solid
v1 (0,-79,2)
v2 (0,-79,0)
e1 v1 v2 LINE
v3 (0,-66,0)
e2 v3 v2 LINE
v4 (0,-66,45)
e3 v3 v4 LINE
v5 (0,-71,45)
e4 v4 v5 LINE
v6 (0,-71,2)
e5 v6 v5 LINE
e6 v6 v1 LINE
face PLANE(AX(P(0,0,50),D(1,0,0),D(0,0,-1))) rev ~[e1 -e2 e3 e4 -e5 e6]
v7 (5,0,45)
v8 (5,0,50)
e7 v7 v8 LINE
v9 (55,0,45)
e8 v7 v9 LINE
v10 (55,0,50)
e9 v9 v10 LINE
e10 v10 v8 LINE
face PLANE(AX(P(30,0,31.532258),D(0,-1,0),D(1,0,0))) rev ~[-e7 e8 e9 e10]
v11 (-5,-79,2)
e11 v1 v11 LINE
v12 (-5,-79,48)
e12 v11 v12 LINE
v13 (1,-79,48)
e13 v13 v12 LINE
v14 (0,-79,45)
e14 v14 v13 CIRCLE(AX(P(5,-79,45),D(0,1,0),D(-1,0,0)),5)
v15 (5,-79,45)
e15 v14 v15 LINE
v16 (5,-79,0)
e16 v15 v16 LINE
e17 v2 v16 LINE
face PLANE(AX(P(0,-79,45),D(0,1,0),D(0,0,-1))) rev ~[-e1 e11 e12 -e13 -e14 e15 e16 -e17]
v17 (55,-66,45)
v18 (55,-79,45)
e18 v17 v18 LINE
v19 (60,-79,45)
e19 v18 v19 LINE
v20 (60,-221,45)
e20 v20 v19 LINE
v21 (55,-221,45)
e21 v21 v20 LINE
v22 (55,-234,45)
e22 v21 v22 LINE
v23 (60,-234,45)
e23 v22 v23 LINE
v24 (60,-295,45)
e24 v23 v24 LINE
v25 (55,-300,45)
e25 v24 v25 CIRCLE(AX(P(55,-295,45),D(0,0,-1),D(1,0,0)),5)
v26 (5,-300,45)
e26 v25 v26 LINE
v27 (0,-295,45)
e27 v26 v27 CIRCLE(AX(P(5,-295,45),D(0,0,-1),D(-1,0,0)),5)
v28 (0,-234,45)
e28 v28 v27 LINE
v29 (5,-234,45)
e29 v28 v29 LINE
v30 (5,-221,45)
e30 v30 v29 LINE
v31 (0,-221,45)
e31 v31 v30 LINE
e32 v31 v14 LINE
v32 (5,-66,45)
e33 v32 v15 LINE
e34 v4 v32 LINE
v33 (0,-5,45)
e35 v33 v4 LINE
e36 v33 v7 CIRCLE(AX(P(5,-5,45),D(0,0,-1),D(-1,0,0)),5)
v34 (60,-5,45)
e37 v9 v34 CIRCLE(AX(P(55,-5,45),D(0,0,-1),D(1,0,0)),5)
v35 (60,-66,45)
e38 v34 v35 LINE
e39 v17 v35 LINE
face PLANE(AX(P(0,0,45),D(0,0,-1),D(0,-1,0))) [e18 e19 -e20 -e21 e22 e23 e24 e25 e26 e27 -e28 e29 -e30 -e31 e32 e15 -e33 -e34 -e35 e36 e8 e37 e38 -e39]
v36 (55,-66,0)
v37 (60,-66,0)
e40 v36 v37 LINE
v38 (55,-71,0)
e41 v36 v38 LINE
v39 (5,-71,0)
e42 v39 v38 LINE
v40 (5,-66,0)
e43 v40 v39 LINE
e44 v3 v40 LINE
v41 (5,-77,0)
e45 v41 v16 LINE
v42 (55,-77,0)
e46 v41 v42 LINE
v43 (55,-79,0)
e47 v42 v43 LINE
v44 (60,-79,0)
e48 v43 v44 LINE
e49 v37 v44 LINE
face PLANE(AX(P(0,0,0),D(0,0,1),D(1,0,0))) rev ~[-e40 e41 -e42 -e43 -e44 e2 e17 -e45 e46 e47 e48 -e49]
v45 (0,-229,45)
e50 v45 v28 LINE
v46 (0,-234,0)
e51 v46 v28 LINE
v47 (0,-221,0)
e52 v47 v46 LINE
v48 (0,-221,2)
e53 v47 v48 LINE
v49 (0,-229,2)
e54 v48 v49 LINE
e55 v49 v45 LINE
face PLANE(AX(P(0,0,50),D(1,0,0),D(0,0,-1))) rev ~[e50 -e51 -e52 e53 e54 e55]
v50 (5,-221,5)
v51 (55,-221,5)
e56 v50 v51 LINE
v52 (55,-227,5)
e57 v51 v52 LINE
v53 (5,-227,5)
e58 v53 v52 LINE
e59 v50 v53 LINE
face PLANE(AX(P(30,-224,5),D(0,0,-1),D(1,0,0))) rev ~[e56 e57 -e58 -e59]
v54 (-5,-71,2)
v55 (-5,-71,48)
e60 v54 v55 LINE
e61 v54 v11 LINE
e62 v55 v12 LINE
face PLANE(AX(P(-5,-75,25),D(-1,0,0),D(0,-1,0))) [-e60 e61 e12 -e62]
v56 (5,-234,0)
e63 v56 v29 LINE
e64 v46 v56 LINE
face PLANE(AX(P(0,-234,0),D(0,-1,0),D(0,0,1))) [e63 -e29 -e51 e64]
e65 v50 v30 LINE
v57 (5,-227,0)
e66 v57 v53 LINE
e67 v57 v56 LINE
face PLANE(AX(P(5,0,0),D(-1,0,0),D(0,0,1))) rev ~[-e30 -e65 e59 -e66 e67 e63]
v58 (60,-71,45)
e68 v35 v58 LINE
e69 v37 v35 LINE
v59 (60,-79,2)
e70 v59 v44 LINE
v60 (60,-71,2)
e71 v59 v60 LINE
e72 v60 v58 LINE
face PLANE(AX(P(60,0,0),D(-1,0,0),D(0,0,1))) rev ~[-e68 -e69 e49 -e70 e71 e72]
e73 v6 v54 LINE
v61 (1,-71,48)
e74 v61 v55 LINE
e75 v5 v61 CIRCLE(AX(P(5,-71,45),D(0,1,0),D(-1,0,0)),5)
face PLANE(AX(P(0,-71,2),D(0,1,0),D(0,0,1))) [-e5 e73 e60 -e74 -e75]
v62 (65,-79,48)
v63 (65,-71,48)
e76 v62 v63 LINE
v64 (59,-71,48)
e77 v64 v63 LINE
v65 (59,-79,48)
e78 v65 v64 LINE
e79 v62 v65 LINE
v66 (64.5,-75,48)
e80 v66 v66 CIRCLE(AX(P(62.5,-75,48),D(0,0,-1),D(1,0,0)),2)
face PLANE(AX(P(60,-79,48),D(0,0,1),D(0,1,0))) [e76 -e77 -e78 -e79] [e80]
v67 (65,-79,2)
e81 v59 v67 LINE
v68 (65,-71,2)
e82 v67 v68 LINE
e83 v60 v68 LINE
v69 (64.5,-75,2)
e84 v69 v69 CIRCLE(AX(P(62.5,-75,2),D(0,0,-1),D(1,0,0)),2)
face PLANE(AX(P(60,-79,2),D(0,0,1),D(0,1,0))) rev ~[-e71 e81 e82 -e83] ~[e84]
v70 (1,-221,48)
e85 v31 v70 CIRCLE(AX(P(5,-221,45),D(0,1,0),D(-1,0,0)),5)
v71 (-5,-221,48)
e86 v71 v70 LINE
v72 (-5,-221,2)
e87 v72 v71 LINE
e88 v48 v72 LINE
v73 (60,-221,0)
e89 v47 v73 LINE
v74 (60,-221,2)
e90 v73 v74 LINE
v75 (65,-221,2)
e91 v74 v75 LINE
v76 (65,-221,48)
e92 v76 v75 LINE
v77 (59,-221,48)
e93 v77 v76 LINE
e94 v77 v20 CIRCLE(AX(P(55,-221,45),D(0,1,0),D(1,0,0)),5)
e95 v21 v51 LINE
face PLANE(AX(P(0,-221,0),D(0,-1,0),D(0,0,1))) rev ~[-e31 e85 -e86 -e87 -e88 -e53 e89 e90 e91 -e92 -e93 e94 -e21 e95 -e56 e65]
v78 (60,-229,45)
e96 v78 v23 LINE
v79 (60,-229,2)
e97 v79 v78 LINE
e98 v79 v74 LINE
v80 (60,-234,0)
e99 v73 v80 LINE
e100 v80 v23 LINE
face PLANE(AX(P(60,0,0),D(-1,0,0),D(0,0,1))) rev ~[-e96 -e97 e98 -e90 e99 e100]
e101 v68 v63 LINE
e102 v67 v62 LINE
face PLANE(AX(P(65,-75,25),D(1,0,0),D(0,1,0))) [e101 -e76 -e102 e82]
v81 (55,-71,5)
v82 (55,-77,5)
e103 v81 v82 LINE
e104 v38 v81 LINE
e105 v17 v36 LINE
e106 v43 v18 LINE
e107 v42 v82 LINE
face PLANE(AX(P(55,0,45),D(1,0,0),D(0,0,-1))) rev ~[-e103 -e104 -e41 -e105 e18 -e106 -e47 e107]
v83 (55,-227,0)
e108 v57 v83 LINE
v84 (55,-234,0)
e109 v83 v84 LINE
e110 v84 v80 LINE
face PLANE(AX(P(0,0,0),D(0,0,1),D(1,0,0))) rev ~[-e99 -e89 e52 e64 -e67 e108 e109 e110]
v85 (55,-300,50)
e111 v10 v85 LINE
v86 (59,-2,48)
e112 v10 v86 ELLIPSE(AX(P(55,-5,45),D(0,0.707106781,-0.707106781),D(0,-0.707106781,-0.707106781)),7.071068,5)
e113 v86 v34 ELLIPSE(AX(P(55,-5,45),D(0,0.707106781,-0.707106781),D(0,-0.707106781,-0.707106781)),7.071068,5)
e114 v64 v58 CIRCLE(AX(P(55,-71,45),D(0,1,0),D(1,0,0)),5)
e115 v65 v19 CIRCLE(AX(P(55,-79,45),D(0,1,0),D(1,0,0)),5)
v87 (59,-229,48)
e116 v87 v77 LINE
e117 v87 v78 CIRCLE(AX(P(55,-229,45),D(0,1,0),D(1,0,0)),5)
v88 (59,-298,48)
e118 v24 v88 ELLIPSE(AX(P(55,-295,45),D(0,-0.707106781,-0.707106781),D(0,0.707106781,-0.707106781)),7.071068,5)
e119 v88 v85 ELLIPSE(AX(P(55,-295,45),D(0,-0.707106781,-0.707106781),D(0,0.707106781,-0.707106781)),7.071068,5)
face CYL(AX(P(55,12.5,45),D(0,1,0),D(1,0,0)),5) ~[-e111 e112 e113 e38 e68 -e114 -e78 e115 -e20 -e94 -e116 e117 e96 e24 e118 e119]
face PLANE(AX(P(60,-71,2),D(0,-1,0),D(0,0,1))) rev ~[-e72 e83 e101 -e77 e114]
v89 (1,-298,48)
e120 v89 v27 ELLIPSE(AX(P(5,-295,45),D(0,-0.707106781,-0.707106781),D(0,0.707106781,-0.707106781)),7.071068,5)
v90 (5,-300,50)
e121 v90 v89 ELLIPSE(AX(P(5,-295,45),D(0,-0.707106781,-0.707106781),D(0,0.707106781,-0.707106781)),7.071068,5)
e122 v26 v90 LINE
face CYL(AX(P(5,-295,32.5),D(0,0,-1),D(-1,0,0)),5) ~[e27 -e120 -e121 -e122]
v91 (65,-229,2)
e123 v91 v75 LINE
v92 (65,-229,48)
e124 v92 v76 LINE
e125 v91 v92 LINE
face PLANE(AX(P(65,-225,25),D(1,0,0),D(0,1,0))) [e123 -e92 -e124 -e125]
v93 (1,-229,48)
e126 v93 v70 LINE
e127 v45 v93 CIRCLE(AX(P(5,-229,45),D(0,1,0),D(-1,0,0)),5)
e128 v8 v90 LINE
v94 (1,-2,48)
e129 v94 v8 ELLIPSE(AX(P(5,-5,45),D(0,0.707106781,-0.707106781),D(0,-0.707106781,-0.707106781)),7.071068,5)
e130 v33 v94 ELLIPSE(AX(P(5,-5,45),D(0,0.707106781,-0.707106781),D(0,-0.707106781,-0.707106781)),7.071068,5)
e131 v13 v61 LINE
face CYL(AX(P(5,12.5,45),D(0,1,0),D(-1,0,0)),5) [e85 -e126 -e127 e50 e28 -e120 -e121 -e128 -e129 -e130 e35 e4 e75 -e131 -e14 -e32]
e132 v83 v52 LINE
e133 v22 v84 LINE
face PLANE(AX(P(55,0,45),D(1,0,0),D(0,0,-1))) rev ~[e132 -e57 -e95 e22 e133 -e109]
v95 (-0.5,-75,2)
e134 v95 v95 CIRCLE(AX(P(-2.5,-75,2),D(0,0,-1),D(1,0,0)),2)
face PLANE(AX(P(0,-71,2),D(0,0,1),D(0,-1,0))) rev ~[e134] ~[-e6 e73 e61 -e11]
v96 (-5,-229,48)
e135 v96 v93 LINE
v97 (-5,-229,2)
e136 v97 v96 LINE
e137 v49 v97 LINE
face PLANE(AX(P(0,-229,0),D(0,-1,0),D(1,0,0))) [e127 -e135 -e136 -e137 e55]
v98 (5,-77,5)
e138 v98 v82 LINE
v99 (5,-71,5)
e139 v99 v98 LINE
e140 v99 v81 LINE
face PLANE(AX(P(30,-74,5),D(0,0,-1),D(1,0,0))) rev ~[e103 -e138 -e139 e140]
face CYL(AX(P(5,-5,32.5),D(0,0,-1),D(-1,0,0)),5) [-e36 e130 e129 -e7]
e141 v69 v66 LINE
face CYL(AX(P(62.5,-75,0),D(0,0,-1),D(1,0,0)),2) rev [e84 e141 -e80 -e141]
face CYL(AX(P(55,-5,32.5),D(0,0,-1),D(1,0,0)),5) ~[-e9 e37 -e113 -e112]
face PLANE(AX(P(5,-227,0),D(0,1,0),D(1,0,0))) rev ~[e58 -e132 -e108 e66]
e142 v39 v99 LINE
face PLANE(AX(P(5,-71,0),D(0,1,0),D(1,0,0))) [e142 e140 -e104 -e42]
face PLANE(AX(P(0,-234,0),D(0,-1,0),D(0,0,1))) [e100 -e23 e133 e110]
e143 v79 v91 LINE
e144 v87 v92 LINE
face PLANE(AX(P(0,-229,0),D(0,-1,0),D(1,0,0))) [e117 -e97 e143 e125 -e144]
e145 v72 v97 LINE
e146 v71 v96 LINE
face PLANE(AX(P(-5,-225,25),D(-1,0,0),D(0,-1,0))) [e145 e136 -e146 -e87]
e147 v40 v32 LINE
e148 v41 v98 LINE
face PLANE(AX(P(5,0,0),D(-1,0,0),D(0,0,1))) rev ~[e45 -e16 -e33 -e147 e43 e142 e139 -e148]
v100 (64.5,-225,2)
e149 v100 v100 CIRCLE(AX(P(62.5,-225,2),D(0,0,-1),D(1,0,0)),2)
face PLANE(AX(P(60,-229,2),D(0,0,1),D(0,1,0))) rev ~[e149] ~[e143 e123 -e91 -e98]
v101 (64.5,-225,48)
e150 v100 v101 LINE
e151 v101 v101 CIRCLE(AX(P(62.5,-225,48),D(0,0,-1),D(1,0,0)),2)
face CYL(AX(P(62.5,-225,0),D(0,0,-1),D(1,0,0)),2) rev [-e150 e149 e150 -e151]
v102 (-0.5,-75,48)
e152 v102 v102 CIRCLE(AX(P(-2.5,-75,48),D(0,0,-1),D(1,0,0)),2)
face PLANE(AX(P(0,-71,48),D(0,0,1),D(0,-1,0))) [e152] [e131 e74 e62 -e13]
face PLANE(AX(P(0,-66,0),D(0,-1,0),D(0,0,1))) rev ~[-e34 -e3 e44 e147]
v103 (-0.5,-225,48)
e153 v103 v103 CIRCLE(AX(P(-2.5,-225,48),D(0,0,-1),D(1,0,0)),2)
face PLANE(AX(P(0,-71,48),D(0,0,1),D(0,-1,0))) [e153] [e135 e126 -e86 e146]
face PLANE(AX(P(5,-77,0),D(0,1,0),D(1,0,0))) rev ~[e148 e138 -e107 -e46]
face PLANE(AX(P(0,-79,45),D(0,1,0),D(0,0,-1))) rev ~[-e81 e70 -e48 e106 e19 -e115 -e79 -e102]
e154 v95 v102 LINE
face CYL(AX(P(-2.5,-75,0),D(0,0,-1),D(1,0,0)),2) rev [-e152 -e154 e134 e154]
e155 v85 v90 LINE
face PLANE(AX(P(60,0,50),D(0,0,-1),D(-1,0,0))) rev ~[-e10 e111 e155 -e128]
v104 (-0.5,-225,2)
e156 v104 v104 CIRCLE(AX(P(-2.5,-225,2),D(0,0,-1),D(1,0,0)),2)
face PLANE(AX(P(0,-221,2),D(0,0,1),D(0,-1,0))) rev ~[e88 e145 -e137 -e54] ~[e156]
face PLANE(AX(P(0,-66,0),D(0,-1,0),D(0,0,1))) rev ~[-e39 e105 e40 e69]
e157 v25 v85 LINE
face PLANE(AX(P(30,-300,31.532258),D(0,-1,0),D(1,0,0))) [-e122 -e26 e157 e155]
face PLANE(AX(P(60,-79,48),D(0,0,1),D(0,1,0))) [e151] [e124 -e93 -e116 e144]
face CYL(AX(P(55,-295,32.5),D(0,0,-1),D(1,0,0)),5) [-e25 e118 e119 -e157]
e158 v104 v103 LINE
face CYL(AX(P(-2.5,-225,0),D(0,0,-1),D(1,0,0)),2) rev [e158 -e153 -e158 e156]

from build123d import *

# Parameters (mm, degrees)
F2_DEPTH      = 300
F3_W          = 8
F3_H          = 46
F4_DEPTH      = 5
F5_W          = 8
F5_H          = 46
F6_DEPTH      = 5
F7_W          = 50
F7_H          = 6
F8_DEPTH      = 5
F9_W          = 66
F9_H          = 45
F10_DEPTH     = 65.001
F11_R         = 2
F12_DEPTH     = 50.001
F13_T1_DEPTH  = 30
F13_T6_DEPTH  = 325
F13_T11_DEPTH = 325
F13_T16_DEPTH = 325
F13_T22_DEPTH = 325
F13_T27_DEPTH = 325
F13_T32_DEPTH = 325
F13_T37_DEPTH = 325
F13_T43_DEPTH = 325


# Not quite as in the source:
# - a fillet or chamfer that OpenCascade refuses, or shapes differently, is made with other operations: its cross-section is extruded or revolved along the edge and cut away or added


with BuildPart() as f2:
    # F1 (on face) → F2 (new body)
    with BuildSketch(Plane.XZ):
        Polygon((0, 0), (5, 0), (5, 45), (55, 45), (55, 0), (60, 0), (60, 50), (0, 50), align=None)
    extrude(amount=F2_DEPTH)

    # F3 (on face) → F4 (join)
    with BuildSketch(Plane.YZ.offset(60)):
        with Locations((-225, 25)):
            Rectangle(F3_W, F3_H)
        with Locations((-75, 25)):
            Rectangle(F3_W, F3_H)
    extrude(amount=F4_DEPTH)

    # F5 (on face) → F6 (join)
    with BuildSketch(Plane(origin=(0, 0, 0), x_dir=(0, -1, 0), z_dir=(-1, 0, 0))):
        with Locations((75, 25)):
            Rectangle(F5_W, F5_H)
        with Locations((225, 25)):
            Rectangle(F5_W, F5_H)
    extrude(amount=F6_DEPTH)

    # F7 (on face) → F8 (join)
    with BuildSketch(Plane(origin=(0, 0, 0), x_dir=(1, 0, 0), z_dir=(0, 0, -1))):
        with Locations((30, 74)):
            Rectangle(F7_W, F7_H)
        with Locations((30, 224)):
            Rectangle(F7_W, F7_H)
    extrude(amount=-F8_DEPTH)

    # F9 (on face) → F10 (cut, through all)
    with BuildSketch(Plane(origin=(0, 0, 0), x_dir=(0, -1, 0), z_dir=(-1, 0, 0))):
        Polygon((221, 45), (79, 45), (79, 2), (79, 0), (221, 0), (221, 2), align=None)
        with Locations((33, 22.5)):
            Rectangle(F9_W, F9_H)
        with Locations((267, 22.5)):
            Rectangle(F9_W, F9_H)
    extrude(amount=-F10_DEPTH, mode=Mode.SUBTRACT)

    # F11 (on Top) → F12 (cut, through all)
    with BuildSketch(Plane.XY):
        with Locations((-2.5, -75)):
            Circle(F11_R)
        with Locations((62.5, -75)):
            Circle(F11_R)
        with Locations((-2.5, -225)):
            Circle(F11_R)
        with Locations((62.5, -225)):
            Circle(F11_R)
    extrude(amount=F12_DEPTH, mode=Mode.SUBTRACT)

    # F13: fillet of radius 5 on 6 edges, made by hand

    # F13_s2 → F13_t1 (cut)
    with BuildSketch(Plane.XY.offset(32.5)):
        with BuildLine():
            ThreePointArc((0, -295), (1.4644660941, -298.5355339059), (5, -300))
            Line((5, -300), (0, -300))
            Line((0, -300), (0, -295))
        make_face()
        with BuildLine():
            ThreePointArc((60, -295), (58.5355339059, -298.5355339059), (55, -300))
            Line((55, -300), (60, -300))
            Line((60, -300), (60, -295))
        make_face()
        with BuildLine():
            ThreePointArc((60, -5), (58.5355339059, -1.4644660941), (55, 0))
            Line((55, 0), (60, 0))
            Line((60, 0), (60, -5))
        make_face()
        with BuildLine():
            ThreePointArc((0, -5), (1.4644660941, -1.4644660941), (5, 0))
            Line((5, 0), (0, 0))
            Line((0, 0), (0, -5))
        make_face()
    extrude(amount=F13_T1_DEPTH, mode=Mode.SUBTRACT)


with BuildPart() as f13_tool4:
    # F13_s5 → F13_t6 (new body)
    with BuildSketch(Plane.XZ.offset(-12.5)):
        with BuildLine():
            ThreePointArc((0, 45), (1.4644660941, 48.5355339059), (5, 50))
            Line((5, 50), (0, 50))
            Line((0, 50), (0, 45))
        make_face()
    extrude(amount=F13_T6_DEPTH)

    split(bisect_by=Plane.XZ.offset(71), keep=Keep.BOTTOM)


with BuildPart() as f2_1:
    add(f2.part)

    # F13_t3: cut F13_tool4
    add(f13_tool4.part, mode=Mode.SUBTRACT)


with BuildPart() as f13_tool9:
    # F13_s10 → F13_t11 (new body)
    with BuildSketch(Plane.XZ.offset(-12.5)):
        with BuildLine():
            ThreePointArc((0, 45), (1.4644660941, 48.5355339059), (5, 50))
            Line((5, 50), (0, 50))
            Line((0, 50), (0, 45))
        make_face()
    extrude(amount=F13_T11_DEPTH)

    split(bisect_by=Plane.XY.offset(48), keep=Keep.TOP)


with BuildPart() as f2_2:
    add(f2_1.part)

    # F13_t8: cut F13_tool9
    add(f13_tool9.part, mode=Mode.SUBTRACT)


with BuildPart() as f13_tool14:
    # F13_s15 → F13_t16 (new body)
    with BuildSketch(Plane.XZ.offset(-12.5)):
        with BuildLine():
            ThreePointArc((0, 45), (1.4644660941, 48.5355339059), (5, 50))
            Line((5, 50), (0, 50))
            Line((0, 50), (0, 45))
        make_face()
    extrude(amount=F13_T16_DEPTH)

    split(bisect_by=Plane.XZ.offset(79), keep=Keep.TOP)

    split(bisect_by=Plane.XZ.offset(221), keep=Keep.BOTTOM)


with BuildPart() as f2_3:
    add(f2_2.part)

    # F13_t13: cut F13_tool14
    add(f13_tool14.part, mode=Mode.SUBTRACT)


with BuildPart() as f13_tool20:
    # F13_s21 → F13_t22 (new body)
    with BuildSketch(Plane.XZ.offset(-12.5)):
        with BuildLine():
            ThreePointArc((0, 45), (1.4644660941, 48.5355339059), (5, 50))
            Line((5, 50), (0, 50))
            Line((0, 50), (0, 45))
        make_face()
    extrude(amount=F13_T22_DEPTH)

    split(bisect_by=Plane.XZ.offset(229), keep=Keep.TOP)


with BuildPart() as f2_4:
    add(f2_3.part)

    # F13_t19: cut F13_tool20
    add(f13_tool20.part, mode=Mode.SUBTRACT)


with BuildPart() as f13_tool25:
    # F13_s26 → F13_t27 (new body)
    with BuildSketch(Plane.XZ.offset(-12.5)):
        with BuildLine():
            ThreePointArc((60, 45), (58.5355339059, 48.5355339059), (55, 50))
            Line((55, 50), (60, 50))
            Line((60, 50), (60, 45))
        make_face()
    extrude(amount=F13_T27_DEPTH)

    split(bisect_by=Plane.XZ.offset(71), keep=Keep.BOTTOM)


with BuildPart() as f2_5:
    add(f2_4.part)

    # F13_t24: cut F13_tool25
    add(f13_tool25.part, mode=Mode.SUBTRACT)


with BuildPart() as f13_tool30:
    # F13_s31 → F13_t32 (new body)
    with BuildSketch(Plane.XZ.offset(-12.5)):
        with BuildLine():
            ThreePointArc((60, 45), (58.5355339059, 48.5355339059), (55, 50))
            Line((55, 50), (60, 50))
            Line((60, 50), (60, 45))
        make_face()
    extrude(amount=F13_T32_DEPTH)

    split(bisect_by=Plane.XY.offset(48), keep=Keep.TOP)


with BuildPart() as f2_6:
    add(f2_5.part)

    # F13_t29: cut F13_tool30
    add(f13_tool30.part, mode=Mode.SUBTRACT)


with BuildPart() as f13_tool35:
    # F13_s36 → F13_t37 (new body)
    with BuildSketch(Plane.XZ.offset(-12.5)):
        with BuildLine():
            ThreePointArc((60, 45), (58.5355339059, 48.5355339059), (55, 50))
            Line((55, 50), (60, 50))
            Line((60, 50), (60, 45))
        make_face()
    extrude(amount=F13_T37_DEPTH)

    split(bisect_by=Plane.XZ.offset(79), keep=Keep.TOP)

    split(bisect_by=Plane.XZ.offset(221), keep=Keep.BOTTOM)


with BuildPart() as f2_7:
    add(f2_6.part)

    # F13_t34: cut F13_tool35
    add(f13_tool35.part, mode=Mode.SUBTRACT)


with BuildPart() as f13_tool41:
    # F13_s42 → F13_t43 (new body)
    with BuildSketch(Plane.XZ.offset(-12.5)):
        with BuildLine():
            ThreePointArc((60, 45), (58.5355339059, 48.5355339059), (55, 50))
            Line((55, 50), (60, 50))
            Line((60, 50), (60, 45))
        make_face()
    extrude(amount=F13_T43_DEPTH)

    split(bisect_by=Plane.XZ.offset(229), keep=Keep.TOP)


with BuildPart() as f2_8:
    add(f2_7.part)

    # F13_t40: cut F13_tool41
    add(f13_tool41.part, mode=Mode.SUBTRACT)


solid = f2_8.part
